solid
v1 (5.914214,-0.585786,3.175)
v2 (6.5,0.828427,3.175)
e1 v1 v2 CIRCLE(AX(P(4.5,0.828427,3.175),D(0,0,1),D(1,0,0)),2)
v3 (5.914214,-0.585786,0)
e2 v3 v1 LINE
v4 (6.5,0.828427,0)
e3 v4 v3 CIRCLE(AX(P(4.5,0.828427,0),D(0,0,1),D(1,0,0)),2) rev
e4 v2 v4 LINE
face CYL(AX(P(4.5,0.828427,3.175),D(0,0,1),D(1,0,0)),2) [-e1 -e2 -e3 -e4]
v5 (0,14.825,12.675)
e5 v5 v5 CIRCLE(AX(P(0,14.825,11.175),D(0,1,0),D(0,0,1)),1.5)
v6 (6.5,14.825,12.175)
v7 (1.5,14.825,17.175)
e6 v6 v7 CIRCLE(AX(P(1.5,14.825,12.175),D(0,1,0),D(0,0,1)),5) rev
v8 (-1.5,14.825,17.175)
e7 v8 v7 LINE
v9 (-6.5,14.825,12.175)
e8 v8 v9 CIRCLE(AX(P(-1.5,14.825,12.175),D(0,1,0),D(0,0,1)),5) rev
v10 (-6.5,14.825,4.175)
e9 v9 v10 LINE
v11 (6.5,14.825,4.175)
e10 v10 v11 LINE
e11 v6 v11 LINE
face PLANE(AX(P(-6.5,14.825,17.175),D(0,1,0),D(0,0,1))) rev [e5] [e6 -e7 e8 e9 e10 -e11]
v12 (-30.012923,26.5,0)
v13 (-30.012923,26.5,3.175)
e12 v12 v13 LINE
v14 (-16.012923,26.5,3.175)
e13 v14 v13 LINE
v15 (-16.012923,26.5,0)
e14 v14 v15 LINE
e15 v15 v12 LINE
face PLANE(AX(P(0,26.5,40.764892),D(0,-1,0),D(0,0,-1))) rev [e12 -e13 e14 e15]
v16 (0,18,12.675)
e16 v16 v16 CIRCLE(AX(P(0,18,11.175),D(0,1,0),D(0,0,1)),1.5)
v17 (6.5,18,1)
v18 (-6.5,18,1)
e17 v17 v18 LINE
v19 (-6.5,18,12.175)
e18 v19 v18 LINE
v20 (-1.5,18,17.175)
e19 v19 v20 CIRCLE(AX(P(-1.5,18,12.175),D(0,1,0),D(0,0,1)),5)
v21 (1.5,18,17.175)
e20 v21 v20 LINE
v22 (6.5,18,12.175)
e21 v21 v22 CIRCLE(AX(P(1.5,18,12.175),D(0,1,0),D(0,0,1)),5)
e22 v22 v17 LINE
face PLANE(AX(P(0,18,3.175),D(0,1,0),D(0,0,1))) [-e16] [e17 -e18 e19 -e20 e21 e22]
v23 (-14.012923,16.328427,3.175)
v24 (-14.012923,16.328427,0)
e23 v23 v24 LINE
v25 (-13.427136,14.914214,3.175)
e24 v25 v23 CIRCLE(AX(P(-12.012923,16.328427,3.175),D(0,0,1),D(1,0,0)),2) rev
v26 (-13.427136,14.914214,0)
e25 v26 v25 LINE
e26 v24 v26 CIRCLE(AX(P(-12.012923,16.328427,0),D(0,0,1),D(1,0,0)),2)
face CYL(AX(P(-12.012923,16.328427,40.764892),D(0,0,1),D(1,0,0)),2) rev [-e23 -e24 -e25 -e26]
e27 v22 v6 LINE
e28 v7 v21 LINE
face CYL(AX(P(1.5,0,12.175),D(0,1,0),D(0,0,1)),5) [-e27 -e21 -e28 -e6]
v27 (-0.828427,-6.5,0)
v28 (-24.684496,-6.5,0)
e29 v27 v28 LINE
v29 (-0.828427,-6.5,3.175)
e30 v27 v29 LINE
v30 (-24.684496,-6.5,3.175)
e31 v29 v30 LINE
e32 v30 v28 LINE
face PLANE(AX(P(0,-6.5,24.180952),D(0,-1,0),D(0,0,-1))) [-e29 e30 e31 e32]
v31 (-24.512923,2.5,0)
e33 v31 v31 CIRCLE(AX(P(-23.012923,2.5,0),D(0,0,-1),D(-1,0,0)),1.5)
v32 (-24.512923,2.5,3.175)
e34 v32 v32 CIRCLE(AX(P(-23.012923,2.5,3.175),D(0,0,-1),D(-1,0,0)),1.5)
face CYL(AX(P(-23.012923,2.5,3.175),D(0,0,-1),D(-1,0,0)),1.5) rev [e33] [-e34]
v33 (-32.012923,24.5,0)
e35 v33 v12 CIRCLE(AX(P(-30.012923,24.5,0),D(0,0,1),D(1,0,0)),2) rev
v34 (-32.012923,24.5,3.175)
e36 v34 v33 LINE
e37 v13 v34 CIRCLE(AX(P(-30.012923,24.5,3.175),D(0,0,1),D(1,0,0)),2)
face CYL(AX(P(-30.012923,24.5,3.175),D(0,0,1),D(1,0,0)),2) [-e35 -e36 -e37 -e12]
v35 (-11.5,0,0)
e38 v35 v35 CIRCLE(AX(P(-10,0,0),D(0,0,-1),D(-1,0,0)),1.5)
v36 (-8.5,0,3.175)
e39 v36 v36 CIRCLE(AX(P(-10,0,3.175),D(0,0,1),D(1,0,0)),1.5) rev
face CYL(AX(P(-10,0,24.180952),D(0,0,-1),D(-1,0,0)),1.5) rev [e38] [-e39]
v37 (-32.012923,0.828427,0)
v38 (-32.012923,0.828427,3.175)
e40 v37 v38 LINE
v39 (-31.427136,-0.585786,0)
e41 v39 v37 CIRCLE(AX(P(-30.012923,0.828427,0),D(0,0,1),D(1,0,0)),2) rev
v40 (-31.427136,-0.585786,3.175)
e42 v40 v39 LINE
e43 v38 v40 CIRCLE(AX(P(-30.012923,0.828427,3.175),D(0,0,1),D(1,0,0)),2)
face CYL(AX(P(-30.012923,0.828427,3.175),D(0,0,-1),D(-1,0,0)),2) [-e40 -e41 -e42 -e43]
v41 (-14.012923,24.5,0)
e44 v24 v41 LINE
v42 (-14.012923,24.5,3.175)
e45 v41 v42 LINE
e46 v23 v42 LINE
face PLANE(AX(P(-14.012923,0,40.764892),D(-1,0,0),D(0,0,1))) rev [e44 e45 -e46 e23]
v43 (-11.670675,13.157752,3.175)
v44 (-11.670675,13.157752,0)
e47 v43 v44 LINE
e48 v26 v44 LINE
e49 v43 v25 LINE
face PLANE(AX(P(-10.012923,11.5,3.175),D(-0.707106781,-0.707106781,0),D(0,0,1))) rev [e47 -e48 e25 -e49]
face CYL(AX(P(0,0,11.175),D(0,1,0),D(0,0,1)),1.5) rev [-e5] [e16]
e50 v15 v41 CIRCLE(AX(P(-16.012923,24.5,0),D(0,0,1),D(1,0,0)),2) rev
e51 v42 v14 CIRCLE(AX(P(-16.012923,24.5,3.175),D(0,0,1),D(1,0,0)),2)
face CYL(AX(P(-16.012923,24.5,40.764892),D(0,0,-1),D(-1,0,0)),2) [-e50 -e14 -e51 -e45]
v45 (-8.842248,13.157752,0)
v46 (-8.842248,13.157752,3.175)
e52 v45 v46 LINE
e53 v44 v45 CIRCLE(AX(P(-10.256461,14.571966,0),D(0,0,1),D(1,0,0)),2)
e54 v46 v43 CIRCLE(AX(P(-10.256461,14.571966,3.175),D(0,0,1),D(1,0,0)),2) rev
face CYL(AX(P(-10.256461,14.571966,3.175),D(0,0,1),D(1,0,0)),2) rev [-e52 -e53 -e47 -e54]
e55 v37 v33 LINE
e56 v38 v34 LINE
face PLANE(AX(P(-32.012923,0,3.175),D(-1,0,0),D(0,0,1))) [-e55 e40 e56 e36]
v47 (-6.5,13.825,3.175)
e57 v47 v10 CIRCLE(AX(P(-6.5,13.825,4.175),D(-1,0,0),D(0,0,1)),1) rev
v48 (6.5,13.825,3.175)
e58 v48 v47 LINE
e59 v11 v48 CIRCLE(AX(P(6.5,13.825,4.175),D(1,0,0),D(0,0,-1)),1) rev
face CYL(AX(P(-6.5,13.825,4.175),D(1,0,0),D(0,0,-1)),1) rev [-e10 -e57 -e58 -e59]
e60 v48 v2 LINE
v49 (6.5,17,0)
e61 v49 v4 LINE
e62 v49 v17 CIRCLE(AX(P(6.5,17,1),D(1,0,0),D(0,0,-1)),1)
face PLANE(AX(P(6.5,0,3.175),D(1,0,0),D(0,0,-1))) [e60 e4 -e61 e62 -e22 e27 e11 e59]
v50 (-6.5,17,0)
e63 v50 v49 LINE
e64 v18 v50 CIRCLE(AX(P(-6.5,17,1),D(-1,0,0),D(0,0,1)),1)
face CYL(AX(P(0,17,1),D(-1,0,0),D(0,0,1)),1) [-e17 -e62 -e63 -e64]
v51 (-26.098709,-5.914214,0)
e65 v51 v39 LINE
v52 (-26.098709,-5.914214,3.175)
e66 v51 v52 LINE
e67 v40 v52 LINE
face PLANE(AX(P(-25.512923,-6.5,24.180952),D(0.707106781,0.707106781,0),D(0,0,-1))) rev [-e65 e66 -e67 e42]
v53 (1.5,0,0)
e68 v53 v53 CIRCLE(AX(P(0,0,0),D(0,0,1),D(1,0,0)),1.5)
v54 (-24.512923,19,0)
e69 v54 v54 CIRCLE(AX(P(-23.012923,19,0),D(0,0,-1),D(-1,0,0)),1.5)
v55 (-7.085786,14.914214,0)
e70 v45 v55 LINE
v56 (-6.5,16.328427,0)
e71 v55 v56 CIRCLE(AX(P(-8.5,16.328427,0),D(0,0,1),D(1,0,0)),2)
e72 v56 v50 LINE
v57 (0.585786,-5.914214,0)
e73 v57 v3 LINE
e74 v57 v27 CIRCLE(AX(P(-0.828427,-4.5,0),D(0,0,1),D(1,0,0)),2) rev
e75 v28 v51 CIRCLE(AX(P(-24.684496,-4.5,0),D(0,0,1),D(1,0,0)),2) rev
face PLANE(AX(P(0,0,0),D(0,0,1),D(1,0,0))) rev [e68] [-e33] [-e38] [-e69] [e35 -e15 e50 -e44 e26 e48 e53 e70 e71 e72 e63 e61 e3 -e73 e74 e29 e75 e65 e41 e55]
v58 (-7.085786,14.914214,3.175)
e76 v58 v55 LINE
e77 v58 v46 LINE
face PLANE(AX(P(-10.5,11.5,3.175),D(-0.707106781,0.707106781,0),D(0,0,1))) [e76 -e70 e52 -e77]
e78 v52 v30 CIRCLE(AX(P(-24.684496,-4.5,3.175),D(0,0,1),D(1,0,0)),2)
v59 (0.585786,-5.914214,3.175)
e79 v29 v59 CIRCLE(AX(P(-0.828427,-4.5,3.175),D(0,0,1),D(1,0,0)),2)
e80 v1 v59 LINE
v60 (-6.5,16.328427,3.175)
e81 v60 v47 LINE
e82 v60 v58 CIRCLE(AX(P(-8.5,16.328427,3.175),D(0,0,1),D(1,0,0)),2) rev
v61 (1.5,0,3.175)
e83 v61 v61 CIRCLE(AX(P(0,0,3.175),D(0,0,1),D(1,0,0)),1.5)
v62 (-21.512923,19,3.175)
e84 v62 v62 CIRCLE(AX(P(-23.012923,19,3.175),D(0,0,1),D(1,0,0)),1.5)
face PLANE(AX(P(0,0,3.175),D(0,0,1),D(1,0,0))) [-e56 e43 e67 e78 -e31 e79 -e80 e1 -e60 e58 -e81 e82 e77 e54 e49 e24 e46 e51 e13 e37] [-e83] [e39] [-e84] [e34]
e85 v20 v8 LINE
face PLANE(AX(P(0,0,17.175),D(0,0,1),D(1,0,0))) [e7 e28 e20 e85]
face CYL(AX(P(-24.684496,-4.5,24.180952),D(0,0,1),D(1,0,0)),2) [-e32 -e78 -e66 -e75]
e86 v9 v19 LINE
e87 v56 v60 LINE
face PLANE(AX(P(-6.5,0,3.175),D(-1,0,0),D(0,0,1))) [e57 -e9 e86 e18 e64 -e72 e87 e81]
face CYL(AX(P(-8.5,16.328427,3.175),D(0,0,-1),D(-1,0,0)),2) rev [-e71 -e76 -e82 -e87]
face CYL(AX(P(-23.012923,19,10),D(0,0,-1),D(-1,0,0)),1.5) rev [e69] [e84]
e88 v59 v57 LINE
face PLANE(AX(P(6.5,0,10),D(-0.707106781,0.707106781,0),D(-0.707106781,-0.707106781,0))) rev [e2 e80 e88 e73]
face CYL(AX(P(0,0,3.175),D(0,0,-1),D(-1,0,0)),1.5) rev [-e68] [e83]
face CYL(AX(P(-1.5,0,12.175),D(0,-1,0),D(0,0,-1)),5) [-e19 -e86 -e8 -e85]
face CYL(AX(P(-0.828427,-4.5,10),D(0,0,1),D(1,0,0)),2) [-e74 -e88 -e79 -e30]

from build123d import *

# Parameters (mm, degrees)
SKETCH1_R               = 6.5
SKETCH1_R_2             = 1.5
BOSS_EXTRUDE1_DEPTH     = 3.175
SKETCH2_W               = 13
SKETCH2_H               = 3.175
BOSS_EXTRUDE2_DEPTH     = 14
SKETCH3_R               = 1.5
CUT_EXTRUDE1_DEPTH      = 18
FILLET1_R               = 5
BOSS_EXTRUDE3_START     = -3.175
BOSS_EXTRUDE3_OUTLINE_R = 1.5
BOSS_EXTRUDE3_DEPTH     = 3.175
FILLET3_R               = 1
BOSS_EXTRUDE4_START     = -3.175
BOSS_EXTRUDE4_DEPTH     = 3.175
SKETCH6_R               = 1.5
CUT_EXTRUDE2_DEPTH      = 3.175
CHAMFER1_SIZE           = 4
FILLET4_R               = 2
CUT_EXTRUDE3_DEPTH      = 10
FILLET5_R               = 2
SKETCH8_R               = 1.5
BOSS_EXTRUDE5_DEPTH     = 3.175
CHAMFER2_SIZE           = 4
FILLET6_R               = 2
SKETCH9_R               = 1.5
CUT_EXTRUDE4_DEPTH      = 10
SKETCH9_3_W             = 16.093211202
SKETCH9_3_H             = 15.71695658
SKETCH9_3_R             = 1.5
SKETCH9_3_W_2           = 4.964902022
SKETCH9_3_H_2           = 7.25050354
BOSS_EXTRUDE6_DEPTH     = 3.175
CHAMFER3_SIZE           = 6.5
FILLET7_R               = 2


# Read off the part's stored shape, not the designer's step: Boss-Extrude3
with BuildPart() as part:
    # Sketch1 → Boss-Extrude1 (new body)
    # profile 1 of 2: a face of its own
    with BuildSketch(Plane.XY):
        Circle(SKETCH1_R)
        Circle(SKETCH1_R_2, mode=Mode.SUBTRACT)
    # profile 2 of 2: a face of its own
    with BuildSketch(Plane.XY):
        with BuildLine():
            Line((-6.5, 18), (-6.5, 0))
            ThreePointArc((-6.5, 0), (0, 6.5), (6.5, 0))
            Line((6.5, 0), (6.5, 18))
            Line((6.5, 18), (-6.5, 18))
        make_face()
    extrude(amount=BOSS_EXTRUDE1_DEPTH)

    # Sketch2 → Boss-Extrude2 (add)
    with BuildSketch(Plane.XY.offset(3.175)):
        with Locations((0, 16.4125)):
            Rectangle(SKETCH2_W, SKETCH2_H)
    extrude(amount=BOSS_EXTRUDE2_DEPTH)

    # Sketch3 → Cut-Extrude1 (cut)
    with BuildSketch(Plane(origin=(0, 18, 0), x_dir=(1, 0, 0), z_dir=(0, 1, 0))):
        with Locations(Location((0, -11.175, 0), (0, 0, 270))):
            Circle(SKETCH3_R)
    extrude(amount=-CUT_EXTRUDE1_DEPTH, mode=Mode.SUBTRACT)

    # Fillet1
    fillet1_edges = [part.edges().sort_by_distance(p)[0] for p in [
        (-6.5, 16.4125, 17.175),
        (6.5, 16.4125, 17.175),
    ]]
    fillet(fillet1_edges, radius=FILLET1_R)

    # Boss-Extrude3 outline → Boss-Extrude3 (add)
    with BuildSketch(Plane(origin=(0, 0, 0), x_dir=(-1, 0, 0), z_dir=(0, 0, -1)).offset(BOSS_EXTRUDE3_START)):
        with BuildLine():
            ThreePointArc((6.5, 0), (4.596194078, -4.596194078), (0, -6.5))
            Line((0, -6.5), (10, -6.5))
            ThreePointArc((10, -6.5), (16.239069091, 1.823188658), (6.5, 5.477225575))
            Line((6.5, 5.477225575), (6.5, 0))
        make_face()
        with Locations((10, 0)):
            Circle(BOSS_EXTRUDE3_OUTLINE_R, mode=Mode.SUBTRACT)
    extrude(amount=BOSS_EXTRUDE3_DEPTH)

    # Fillet3
    fillet3_edges = [part.edges().sort_by_distance(p)[0] for p in [
        (0, 14.825, 3.175),
        (0, 18, 0),
    ]]
    fillet(fillet3_edges, radius=FILLET3_R)

    # Sketch5 → Boss-Extrude4 (add)
    with BuildSketch(Plane(origin=(0, 0, 0), x_dir=(-1, 0, 0), z_dir=(0, 0, -1)).offset(BOSS_EXTRUDE4_START)):
        with BuildLine():
            Line((32.012922913, -6.5), (32.012922913, 11.5))
            Line((32.012922913, 11.5), (6.5, 11.5))
            Line((6.5, 11.5), (6.5, 5.477225575))
            ThreePointArc((6.5, 5.477225575), (16.239069091, 1.823188658), (10, -6.5))
            Line((10, -6.5), (32.012922913, -6.5))
        make_face()
    extrude(amount=BOSS_EXTRUDE4_DEPTH)

    # Sketch6 → Cut-Extrude2 (cut)
    with BuildSketch(Plane(origin=(0, 0, 0), x_dir=(-1, 0, 0), z_dir=(0, 0, -1))):
        with Locations((18.012922913, -2.5)):
            Circle(SKETCH6_R)
        with Locations((28.012922913, -2.5)):
            Circle(SKETCH6_R)
        with Locations((18.012922913, 7.5)):
            Circle(SKETCH6_R)
        with Locations((28.012922913, 7.5)):
            Circle(SKETCH6_R)
        with Locations((23.012922913, 2.5)):
            Circle(SKETCH6_R)
    extrude(amount=-CUT_EXTRUDE2_DEPTH, mode=Mode.SUBTRACT)

    # Chamfer1
    # the kernel refuses this chamfer: 4 mm, written as the material it adds along each edge
    with BuildSketch(Plane(origin=(-6.5, 11.5, 3.175), x_dir=(0.027495876610586053, 0.9996219169112968, 0), z_dir=(0, 0, -1))) as chamfer1_piece_1:
        Polygon((CHAMFER1_SIZE * 0.999621916911, -CHAMFER1_SIZE * 0.0274958766106), (-CHAMFER1_SIZE * 0.0274958766106, -CHAMFER1_SIZE * 0.999621916911), (0, 0), align=None)
    extrude(amount=3.175)

    # Fillet4
    fillet4_edges = [part.edges().sort_by_distance(p)[0] for p in [
        (-32.012922913, 11.5, 1.5875),
        (-32.012922913, -6.5, 1.5875),
    ]]
    fillet(fillet4_edges, radius=FILLET4_R)

    # Sketch7 → Cut-Extrude3 (cut)
    with BuildSketch(Plane(origin=(0, 0, 0), x_dir=(-1, 0, 0), z_dir=(0, 0, -1))):
        Polygon((-6.5, 0), (0, -6.5), (-6.5, -6.5), align=None)
    extrude(amount=-CUT_EXTRUDE3_DEPTH, mode=Mode.SUBTRACT)

    # Fillet5
    fillet5_edges = [part.edges().sort_by_distance(p)[0] for p in [
        (6.5, 0, 1.5875),
        (-10.5, 11.5, 1.5875),
        (-6.5, 15.5, 1.5875),
        (0, -6.5, 1.5875),
    ]]
    fillet(fillet5_edges, radius=FILLET5_R)

    # Sketch8 → Boss-Extrude5 (add)
    # profile 1 of 4: a face of its own
    with BuildSketch(Plane(origin=(0, 0, 0), x_dir=(-1, 0, 0), z_dir=(0, 0, -1))):
        with BuildLine():
            Line((14.012922913, 11.5), (14.012922913, -6.5))
            Line((14.012922913, -6.5), (30.012922913, -6.5))
            ThreePointArc((30.012922913, -6.5), (31.427136475, -5.914213562), (32.012922913, -4.5))
            Line((32.012922913, -4.5), (32.012922913, 9.5))
            ThreePointArc((32.012922913, 9.5), (31.427136475, 10.914213562), (30.012922913, 11.5))
            Line((30.012922913, 11.5), (14.012922913, 11.5))
        make_face()
        with Locations((18.012922913, -2.5)):
            Circle(SKETCH8_R, mode=Mode.SUBTRACT)
        with Locations((18.012922913, 7.5)):
            Circle(SKETCH8_R, mode=Mode.SUBTRACT)
        with Locations((23.012922913, 2.5)):
            Circle(SKETCH8_R, mode=Mode.SUBTRACT)
        with Locations((28.012922913, -2.5)):
            Circle(SKETCH8_R, mode=Mode.SUBTRACT)
        with Locations((28.012922913, 7.5)):
            Circle(SKETCH8_R, mode=Mode.SUBTRACT)
    # profile 2 of 4: a face of its own
    with BuildSketch(Plane(origin=(0, 0, 0), x_dir=(-1, 0, 0), z_dir=(0, 0, -1))):
        Polygon((14.012922913, 26.5), (14.012922913, 11.5), (30.012922913, 11.5), (32.012922913, 11.5), (32.012922913, 26.5), align=None)
    # profile 3 of 4: a face of its own
    with BuildSketch(Plane(origin=(0, 0, 0), x_dir=(-1, 0, 0), z_dir=(0, 0, -1))):
        with BuildLine():
            Line((32.012922913, 11.5), (30.012922913, 11.5))
            ThreePointArc((30.012922913, 11.5), (31.427136475, 10.914213562), (32.012922913, 9.5))
            Line((32.012922913, 9.5), (32.012922913, 11.5))
        make_face()
    # profile 4 of 4: a face of its own
    with BuildSketch(Plane(origin=(0, 0, 0), x_dir=(-1, 0, 0), z_dir=(0, 0, -1))):
        with BuildLine():
            ThreePointArc((32.012922913, -4.5), (31.427136475, -5.914213562), (30.012922913, -6.5))
            Line((30.012922913, -6.5), (32.012922913, -6.5))
            Line((32.012922913, -6.5), (32.012922913, -4.5))
        make_face()
    extrude(amount=-BOSS_EXTRUDE5_DEPTH)

    # Chamfer2
    # the kernel refuses this chamfer: 4 mm, written as the material it adds along each edge
    with BuildSketch(Plane(origin=(-14.012922913, 11.5, 0), x_dir=(-0.027495876610586053, 0.9996219169112968, 0), z_dir=(0, 0, 1))) as chamfer2_piece_1:
        Polygon((CHAMFER2_SIZE * 0.999621916911, -CHAMFER2_SIZE * 0.0274958766106), (-CHAMFER2_SIZE * 0.0274958766106, -CHAMFER2_SIZE * 0.999621916911), (0, 0), align=None)
    extrude(amount=3.175)

    # Fillet6
    fillet6_edges = [part.edges().sort_by_distance(p)[0] for p in [
        (-32.012922913, 26.5, 1.5875),
        (-14.012922913, 26.5, 1.5875),
        (-14.012922913, 15.5, 1.5875),
        (-10.298499236, 11.785576323, 1.5875),
    ]]
    fillet(fillet6_edges, radius=FILLET6_R)

    # Sketch9 → Cut-Extrude4 (cut)
    with BuildSketch(Plane(origin=(0, 0, 0), x_dir=(-1, 0, 0), z_dir=(0, 0, -1))):
        with Locations((23.012922913, 19)):
            Circle(SKETCH9_R)
    extrude(amount=-CUT_EXTRUDE4_DEPTH, mode=Mode.SUBTRACT)

    # Sketch9<3> → Boss-Extrude6 (add)
    # profile 1 of 5: a face of its own
    with BuildSketch(Plane(origin=(0, 0, 0), x_dir=(-1, 0, 0), z_dir=(0, 0, -1))):
        with Locations((23.012922913, 2.5)):
            Rectangle(SKETCH9_3_W, SKETCH9_3_H)
        with Locations((28.012922913, -2.5)):
            Circle(SKETCH9_3_R, mode=Mode.SUBTRACT)
        with Locations((18.012922913, 7.5)):
            Circle(SKETCH9_3_R, mode=Mode.SUBTRACT)
        with Locations((18.012922913, -2.5)):
            Circle(SKETCH9_3_R, mode=Mode.SUBTRACT)
        with Locations((28.012922913, 7.5)):
            Circle(SKETCH9_3_R, mode=Mode.SUBTRACT)
        with Locations((23.012922913, 2.5)):
            Rectangle(SKETCH9_3_W_2, SKETCH9_3_H_2, mode=Mode.SUBTRACT)
    # profile 2 of 5: a face of its own
    with BuildSketch(Plane(origin=(0, 0, 0), x_dir=(-1, 0, 0), z_dir=(0, 0, -1))):
        with Locations((28.012922913, -2.5)):
            Circle(SKETCH9_3_R)
    # profile 3 of 5: a face of its own
    with BuildSketch(Plane(origin=(0, 0, 0), x_dir=(-1, 0, 0), z_dir=(0, 0, -1))):
        with Locations((28.012922913, 7.5)):
            Circle(SKETCH9_3_R)
    # profile 4 of 5: a face of its own
    with BuildSketch(Plane(origin=(0, 0, 0), x_dir=(-1, 0, 0), z_dir=(0, 0, -1))):
        with Locations((18.012922913, 7.5)):
            Circle(SKETCH9_3_R)
    # profile 5 of 5: a face of its own
    with BuildSketch(Plane(origin=(0, 0, 0), x_dir=(-1, 0, 0), z_dir=(0, 0, -1))):
        with Locations((18.012922913, -2.5)):
            Circle(SKETCH9_3_R)
    extrude(amount=-BOSS_EXTRUDE6_DEPTH)

    # Chamfer3
    chamfer3_edges = [part.edges().sort_by_distance(p)[0] for p in [
        (-32.012922913, -6.5, 1.5875),
    ]]
    chamfer(chamfer3_edges, length=CHAMFER3_SIZE)

    # Fillet7
    fillet7_edges = [part.edges().sort_by_distance(p)[0] for p in [
        (-25.512922913, -6.5, 1.5875),
        (-32.012922913, 0, 1.5875),
    ]]
    fillet(fillet7_edges, radius=FILLET7_R)


solid = part.part
